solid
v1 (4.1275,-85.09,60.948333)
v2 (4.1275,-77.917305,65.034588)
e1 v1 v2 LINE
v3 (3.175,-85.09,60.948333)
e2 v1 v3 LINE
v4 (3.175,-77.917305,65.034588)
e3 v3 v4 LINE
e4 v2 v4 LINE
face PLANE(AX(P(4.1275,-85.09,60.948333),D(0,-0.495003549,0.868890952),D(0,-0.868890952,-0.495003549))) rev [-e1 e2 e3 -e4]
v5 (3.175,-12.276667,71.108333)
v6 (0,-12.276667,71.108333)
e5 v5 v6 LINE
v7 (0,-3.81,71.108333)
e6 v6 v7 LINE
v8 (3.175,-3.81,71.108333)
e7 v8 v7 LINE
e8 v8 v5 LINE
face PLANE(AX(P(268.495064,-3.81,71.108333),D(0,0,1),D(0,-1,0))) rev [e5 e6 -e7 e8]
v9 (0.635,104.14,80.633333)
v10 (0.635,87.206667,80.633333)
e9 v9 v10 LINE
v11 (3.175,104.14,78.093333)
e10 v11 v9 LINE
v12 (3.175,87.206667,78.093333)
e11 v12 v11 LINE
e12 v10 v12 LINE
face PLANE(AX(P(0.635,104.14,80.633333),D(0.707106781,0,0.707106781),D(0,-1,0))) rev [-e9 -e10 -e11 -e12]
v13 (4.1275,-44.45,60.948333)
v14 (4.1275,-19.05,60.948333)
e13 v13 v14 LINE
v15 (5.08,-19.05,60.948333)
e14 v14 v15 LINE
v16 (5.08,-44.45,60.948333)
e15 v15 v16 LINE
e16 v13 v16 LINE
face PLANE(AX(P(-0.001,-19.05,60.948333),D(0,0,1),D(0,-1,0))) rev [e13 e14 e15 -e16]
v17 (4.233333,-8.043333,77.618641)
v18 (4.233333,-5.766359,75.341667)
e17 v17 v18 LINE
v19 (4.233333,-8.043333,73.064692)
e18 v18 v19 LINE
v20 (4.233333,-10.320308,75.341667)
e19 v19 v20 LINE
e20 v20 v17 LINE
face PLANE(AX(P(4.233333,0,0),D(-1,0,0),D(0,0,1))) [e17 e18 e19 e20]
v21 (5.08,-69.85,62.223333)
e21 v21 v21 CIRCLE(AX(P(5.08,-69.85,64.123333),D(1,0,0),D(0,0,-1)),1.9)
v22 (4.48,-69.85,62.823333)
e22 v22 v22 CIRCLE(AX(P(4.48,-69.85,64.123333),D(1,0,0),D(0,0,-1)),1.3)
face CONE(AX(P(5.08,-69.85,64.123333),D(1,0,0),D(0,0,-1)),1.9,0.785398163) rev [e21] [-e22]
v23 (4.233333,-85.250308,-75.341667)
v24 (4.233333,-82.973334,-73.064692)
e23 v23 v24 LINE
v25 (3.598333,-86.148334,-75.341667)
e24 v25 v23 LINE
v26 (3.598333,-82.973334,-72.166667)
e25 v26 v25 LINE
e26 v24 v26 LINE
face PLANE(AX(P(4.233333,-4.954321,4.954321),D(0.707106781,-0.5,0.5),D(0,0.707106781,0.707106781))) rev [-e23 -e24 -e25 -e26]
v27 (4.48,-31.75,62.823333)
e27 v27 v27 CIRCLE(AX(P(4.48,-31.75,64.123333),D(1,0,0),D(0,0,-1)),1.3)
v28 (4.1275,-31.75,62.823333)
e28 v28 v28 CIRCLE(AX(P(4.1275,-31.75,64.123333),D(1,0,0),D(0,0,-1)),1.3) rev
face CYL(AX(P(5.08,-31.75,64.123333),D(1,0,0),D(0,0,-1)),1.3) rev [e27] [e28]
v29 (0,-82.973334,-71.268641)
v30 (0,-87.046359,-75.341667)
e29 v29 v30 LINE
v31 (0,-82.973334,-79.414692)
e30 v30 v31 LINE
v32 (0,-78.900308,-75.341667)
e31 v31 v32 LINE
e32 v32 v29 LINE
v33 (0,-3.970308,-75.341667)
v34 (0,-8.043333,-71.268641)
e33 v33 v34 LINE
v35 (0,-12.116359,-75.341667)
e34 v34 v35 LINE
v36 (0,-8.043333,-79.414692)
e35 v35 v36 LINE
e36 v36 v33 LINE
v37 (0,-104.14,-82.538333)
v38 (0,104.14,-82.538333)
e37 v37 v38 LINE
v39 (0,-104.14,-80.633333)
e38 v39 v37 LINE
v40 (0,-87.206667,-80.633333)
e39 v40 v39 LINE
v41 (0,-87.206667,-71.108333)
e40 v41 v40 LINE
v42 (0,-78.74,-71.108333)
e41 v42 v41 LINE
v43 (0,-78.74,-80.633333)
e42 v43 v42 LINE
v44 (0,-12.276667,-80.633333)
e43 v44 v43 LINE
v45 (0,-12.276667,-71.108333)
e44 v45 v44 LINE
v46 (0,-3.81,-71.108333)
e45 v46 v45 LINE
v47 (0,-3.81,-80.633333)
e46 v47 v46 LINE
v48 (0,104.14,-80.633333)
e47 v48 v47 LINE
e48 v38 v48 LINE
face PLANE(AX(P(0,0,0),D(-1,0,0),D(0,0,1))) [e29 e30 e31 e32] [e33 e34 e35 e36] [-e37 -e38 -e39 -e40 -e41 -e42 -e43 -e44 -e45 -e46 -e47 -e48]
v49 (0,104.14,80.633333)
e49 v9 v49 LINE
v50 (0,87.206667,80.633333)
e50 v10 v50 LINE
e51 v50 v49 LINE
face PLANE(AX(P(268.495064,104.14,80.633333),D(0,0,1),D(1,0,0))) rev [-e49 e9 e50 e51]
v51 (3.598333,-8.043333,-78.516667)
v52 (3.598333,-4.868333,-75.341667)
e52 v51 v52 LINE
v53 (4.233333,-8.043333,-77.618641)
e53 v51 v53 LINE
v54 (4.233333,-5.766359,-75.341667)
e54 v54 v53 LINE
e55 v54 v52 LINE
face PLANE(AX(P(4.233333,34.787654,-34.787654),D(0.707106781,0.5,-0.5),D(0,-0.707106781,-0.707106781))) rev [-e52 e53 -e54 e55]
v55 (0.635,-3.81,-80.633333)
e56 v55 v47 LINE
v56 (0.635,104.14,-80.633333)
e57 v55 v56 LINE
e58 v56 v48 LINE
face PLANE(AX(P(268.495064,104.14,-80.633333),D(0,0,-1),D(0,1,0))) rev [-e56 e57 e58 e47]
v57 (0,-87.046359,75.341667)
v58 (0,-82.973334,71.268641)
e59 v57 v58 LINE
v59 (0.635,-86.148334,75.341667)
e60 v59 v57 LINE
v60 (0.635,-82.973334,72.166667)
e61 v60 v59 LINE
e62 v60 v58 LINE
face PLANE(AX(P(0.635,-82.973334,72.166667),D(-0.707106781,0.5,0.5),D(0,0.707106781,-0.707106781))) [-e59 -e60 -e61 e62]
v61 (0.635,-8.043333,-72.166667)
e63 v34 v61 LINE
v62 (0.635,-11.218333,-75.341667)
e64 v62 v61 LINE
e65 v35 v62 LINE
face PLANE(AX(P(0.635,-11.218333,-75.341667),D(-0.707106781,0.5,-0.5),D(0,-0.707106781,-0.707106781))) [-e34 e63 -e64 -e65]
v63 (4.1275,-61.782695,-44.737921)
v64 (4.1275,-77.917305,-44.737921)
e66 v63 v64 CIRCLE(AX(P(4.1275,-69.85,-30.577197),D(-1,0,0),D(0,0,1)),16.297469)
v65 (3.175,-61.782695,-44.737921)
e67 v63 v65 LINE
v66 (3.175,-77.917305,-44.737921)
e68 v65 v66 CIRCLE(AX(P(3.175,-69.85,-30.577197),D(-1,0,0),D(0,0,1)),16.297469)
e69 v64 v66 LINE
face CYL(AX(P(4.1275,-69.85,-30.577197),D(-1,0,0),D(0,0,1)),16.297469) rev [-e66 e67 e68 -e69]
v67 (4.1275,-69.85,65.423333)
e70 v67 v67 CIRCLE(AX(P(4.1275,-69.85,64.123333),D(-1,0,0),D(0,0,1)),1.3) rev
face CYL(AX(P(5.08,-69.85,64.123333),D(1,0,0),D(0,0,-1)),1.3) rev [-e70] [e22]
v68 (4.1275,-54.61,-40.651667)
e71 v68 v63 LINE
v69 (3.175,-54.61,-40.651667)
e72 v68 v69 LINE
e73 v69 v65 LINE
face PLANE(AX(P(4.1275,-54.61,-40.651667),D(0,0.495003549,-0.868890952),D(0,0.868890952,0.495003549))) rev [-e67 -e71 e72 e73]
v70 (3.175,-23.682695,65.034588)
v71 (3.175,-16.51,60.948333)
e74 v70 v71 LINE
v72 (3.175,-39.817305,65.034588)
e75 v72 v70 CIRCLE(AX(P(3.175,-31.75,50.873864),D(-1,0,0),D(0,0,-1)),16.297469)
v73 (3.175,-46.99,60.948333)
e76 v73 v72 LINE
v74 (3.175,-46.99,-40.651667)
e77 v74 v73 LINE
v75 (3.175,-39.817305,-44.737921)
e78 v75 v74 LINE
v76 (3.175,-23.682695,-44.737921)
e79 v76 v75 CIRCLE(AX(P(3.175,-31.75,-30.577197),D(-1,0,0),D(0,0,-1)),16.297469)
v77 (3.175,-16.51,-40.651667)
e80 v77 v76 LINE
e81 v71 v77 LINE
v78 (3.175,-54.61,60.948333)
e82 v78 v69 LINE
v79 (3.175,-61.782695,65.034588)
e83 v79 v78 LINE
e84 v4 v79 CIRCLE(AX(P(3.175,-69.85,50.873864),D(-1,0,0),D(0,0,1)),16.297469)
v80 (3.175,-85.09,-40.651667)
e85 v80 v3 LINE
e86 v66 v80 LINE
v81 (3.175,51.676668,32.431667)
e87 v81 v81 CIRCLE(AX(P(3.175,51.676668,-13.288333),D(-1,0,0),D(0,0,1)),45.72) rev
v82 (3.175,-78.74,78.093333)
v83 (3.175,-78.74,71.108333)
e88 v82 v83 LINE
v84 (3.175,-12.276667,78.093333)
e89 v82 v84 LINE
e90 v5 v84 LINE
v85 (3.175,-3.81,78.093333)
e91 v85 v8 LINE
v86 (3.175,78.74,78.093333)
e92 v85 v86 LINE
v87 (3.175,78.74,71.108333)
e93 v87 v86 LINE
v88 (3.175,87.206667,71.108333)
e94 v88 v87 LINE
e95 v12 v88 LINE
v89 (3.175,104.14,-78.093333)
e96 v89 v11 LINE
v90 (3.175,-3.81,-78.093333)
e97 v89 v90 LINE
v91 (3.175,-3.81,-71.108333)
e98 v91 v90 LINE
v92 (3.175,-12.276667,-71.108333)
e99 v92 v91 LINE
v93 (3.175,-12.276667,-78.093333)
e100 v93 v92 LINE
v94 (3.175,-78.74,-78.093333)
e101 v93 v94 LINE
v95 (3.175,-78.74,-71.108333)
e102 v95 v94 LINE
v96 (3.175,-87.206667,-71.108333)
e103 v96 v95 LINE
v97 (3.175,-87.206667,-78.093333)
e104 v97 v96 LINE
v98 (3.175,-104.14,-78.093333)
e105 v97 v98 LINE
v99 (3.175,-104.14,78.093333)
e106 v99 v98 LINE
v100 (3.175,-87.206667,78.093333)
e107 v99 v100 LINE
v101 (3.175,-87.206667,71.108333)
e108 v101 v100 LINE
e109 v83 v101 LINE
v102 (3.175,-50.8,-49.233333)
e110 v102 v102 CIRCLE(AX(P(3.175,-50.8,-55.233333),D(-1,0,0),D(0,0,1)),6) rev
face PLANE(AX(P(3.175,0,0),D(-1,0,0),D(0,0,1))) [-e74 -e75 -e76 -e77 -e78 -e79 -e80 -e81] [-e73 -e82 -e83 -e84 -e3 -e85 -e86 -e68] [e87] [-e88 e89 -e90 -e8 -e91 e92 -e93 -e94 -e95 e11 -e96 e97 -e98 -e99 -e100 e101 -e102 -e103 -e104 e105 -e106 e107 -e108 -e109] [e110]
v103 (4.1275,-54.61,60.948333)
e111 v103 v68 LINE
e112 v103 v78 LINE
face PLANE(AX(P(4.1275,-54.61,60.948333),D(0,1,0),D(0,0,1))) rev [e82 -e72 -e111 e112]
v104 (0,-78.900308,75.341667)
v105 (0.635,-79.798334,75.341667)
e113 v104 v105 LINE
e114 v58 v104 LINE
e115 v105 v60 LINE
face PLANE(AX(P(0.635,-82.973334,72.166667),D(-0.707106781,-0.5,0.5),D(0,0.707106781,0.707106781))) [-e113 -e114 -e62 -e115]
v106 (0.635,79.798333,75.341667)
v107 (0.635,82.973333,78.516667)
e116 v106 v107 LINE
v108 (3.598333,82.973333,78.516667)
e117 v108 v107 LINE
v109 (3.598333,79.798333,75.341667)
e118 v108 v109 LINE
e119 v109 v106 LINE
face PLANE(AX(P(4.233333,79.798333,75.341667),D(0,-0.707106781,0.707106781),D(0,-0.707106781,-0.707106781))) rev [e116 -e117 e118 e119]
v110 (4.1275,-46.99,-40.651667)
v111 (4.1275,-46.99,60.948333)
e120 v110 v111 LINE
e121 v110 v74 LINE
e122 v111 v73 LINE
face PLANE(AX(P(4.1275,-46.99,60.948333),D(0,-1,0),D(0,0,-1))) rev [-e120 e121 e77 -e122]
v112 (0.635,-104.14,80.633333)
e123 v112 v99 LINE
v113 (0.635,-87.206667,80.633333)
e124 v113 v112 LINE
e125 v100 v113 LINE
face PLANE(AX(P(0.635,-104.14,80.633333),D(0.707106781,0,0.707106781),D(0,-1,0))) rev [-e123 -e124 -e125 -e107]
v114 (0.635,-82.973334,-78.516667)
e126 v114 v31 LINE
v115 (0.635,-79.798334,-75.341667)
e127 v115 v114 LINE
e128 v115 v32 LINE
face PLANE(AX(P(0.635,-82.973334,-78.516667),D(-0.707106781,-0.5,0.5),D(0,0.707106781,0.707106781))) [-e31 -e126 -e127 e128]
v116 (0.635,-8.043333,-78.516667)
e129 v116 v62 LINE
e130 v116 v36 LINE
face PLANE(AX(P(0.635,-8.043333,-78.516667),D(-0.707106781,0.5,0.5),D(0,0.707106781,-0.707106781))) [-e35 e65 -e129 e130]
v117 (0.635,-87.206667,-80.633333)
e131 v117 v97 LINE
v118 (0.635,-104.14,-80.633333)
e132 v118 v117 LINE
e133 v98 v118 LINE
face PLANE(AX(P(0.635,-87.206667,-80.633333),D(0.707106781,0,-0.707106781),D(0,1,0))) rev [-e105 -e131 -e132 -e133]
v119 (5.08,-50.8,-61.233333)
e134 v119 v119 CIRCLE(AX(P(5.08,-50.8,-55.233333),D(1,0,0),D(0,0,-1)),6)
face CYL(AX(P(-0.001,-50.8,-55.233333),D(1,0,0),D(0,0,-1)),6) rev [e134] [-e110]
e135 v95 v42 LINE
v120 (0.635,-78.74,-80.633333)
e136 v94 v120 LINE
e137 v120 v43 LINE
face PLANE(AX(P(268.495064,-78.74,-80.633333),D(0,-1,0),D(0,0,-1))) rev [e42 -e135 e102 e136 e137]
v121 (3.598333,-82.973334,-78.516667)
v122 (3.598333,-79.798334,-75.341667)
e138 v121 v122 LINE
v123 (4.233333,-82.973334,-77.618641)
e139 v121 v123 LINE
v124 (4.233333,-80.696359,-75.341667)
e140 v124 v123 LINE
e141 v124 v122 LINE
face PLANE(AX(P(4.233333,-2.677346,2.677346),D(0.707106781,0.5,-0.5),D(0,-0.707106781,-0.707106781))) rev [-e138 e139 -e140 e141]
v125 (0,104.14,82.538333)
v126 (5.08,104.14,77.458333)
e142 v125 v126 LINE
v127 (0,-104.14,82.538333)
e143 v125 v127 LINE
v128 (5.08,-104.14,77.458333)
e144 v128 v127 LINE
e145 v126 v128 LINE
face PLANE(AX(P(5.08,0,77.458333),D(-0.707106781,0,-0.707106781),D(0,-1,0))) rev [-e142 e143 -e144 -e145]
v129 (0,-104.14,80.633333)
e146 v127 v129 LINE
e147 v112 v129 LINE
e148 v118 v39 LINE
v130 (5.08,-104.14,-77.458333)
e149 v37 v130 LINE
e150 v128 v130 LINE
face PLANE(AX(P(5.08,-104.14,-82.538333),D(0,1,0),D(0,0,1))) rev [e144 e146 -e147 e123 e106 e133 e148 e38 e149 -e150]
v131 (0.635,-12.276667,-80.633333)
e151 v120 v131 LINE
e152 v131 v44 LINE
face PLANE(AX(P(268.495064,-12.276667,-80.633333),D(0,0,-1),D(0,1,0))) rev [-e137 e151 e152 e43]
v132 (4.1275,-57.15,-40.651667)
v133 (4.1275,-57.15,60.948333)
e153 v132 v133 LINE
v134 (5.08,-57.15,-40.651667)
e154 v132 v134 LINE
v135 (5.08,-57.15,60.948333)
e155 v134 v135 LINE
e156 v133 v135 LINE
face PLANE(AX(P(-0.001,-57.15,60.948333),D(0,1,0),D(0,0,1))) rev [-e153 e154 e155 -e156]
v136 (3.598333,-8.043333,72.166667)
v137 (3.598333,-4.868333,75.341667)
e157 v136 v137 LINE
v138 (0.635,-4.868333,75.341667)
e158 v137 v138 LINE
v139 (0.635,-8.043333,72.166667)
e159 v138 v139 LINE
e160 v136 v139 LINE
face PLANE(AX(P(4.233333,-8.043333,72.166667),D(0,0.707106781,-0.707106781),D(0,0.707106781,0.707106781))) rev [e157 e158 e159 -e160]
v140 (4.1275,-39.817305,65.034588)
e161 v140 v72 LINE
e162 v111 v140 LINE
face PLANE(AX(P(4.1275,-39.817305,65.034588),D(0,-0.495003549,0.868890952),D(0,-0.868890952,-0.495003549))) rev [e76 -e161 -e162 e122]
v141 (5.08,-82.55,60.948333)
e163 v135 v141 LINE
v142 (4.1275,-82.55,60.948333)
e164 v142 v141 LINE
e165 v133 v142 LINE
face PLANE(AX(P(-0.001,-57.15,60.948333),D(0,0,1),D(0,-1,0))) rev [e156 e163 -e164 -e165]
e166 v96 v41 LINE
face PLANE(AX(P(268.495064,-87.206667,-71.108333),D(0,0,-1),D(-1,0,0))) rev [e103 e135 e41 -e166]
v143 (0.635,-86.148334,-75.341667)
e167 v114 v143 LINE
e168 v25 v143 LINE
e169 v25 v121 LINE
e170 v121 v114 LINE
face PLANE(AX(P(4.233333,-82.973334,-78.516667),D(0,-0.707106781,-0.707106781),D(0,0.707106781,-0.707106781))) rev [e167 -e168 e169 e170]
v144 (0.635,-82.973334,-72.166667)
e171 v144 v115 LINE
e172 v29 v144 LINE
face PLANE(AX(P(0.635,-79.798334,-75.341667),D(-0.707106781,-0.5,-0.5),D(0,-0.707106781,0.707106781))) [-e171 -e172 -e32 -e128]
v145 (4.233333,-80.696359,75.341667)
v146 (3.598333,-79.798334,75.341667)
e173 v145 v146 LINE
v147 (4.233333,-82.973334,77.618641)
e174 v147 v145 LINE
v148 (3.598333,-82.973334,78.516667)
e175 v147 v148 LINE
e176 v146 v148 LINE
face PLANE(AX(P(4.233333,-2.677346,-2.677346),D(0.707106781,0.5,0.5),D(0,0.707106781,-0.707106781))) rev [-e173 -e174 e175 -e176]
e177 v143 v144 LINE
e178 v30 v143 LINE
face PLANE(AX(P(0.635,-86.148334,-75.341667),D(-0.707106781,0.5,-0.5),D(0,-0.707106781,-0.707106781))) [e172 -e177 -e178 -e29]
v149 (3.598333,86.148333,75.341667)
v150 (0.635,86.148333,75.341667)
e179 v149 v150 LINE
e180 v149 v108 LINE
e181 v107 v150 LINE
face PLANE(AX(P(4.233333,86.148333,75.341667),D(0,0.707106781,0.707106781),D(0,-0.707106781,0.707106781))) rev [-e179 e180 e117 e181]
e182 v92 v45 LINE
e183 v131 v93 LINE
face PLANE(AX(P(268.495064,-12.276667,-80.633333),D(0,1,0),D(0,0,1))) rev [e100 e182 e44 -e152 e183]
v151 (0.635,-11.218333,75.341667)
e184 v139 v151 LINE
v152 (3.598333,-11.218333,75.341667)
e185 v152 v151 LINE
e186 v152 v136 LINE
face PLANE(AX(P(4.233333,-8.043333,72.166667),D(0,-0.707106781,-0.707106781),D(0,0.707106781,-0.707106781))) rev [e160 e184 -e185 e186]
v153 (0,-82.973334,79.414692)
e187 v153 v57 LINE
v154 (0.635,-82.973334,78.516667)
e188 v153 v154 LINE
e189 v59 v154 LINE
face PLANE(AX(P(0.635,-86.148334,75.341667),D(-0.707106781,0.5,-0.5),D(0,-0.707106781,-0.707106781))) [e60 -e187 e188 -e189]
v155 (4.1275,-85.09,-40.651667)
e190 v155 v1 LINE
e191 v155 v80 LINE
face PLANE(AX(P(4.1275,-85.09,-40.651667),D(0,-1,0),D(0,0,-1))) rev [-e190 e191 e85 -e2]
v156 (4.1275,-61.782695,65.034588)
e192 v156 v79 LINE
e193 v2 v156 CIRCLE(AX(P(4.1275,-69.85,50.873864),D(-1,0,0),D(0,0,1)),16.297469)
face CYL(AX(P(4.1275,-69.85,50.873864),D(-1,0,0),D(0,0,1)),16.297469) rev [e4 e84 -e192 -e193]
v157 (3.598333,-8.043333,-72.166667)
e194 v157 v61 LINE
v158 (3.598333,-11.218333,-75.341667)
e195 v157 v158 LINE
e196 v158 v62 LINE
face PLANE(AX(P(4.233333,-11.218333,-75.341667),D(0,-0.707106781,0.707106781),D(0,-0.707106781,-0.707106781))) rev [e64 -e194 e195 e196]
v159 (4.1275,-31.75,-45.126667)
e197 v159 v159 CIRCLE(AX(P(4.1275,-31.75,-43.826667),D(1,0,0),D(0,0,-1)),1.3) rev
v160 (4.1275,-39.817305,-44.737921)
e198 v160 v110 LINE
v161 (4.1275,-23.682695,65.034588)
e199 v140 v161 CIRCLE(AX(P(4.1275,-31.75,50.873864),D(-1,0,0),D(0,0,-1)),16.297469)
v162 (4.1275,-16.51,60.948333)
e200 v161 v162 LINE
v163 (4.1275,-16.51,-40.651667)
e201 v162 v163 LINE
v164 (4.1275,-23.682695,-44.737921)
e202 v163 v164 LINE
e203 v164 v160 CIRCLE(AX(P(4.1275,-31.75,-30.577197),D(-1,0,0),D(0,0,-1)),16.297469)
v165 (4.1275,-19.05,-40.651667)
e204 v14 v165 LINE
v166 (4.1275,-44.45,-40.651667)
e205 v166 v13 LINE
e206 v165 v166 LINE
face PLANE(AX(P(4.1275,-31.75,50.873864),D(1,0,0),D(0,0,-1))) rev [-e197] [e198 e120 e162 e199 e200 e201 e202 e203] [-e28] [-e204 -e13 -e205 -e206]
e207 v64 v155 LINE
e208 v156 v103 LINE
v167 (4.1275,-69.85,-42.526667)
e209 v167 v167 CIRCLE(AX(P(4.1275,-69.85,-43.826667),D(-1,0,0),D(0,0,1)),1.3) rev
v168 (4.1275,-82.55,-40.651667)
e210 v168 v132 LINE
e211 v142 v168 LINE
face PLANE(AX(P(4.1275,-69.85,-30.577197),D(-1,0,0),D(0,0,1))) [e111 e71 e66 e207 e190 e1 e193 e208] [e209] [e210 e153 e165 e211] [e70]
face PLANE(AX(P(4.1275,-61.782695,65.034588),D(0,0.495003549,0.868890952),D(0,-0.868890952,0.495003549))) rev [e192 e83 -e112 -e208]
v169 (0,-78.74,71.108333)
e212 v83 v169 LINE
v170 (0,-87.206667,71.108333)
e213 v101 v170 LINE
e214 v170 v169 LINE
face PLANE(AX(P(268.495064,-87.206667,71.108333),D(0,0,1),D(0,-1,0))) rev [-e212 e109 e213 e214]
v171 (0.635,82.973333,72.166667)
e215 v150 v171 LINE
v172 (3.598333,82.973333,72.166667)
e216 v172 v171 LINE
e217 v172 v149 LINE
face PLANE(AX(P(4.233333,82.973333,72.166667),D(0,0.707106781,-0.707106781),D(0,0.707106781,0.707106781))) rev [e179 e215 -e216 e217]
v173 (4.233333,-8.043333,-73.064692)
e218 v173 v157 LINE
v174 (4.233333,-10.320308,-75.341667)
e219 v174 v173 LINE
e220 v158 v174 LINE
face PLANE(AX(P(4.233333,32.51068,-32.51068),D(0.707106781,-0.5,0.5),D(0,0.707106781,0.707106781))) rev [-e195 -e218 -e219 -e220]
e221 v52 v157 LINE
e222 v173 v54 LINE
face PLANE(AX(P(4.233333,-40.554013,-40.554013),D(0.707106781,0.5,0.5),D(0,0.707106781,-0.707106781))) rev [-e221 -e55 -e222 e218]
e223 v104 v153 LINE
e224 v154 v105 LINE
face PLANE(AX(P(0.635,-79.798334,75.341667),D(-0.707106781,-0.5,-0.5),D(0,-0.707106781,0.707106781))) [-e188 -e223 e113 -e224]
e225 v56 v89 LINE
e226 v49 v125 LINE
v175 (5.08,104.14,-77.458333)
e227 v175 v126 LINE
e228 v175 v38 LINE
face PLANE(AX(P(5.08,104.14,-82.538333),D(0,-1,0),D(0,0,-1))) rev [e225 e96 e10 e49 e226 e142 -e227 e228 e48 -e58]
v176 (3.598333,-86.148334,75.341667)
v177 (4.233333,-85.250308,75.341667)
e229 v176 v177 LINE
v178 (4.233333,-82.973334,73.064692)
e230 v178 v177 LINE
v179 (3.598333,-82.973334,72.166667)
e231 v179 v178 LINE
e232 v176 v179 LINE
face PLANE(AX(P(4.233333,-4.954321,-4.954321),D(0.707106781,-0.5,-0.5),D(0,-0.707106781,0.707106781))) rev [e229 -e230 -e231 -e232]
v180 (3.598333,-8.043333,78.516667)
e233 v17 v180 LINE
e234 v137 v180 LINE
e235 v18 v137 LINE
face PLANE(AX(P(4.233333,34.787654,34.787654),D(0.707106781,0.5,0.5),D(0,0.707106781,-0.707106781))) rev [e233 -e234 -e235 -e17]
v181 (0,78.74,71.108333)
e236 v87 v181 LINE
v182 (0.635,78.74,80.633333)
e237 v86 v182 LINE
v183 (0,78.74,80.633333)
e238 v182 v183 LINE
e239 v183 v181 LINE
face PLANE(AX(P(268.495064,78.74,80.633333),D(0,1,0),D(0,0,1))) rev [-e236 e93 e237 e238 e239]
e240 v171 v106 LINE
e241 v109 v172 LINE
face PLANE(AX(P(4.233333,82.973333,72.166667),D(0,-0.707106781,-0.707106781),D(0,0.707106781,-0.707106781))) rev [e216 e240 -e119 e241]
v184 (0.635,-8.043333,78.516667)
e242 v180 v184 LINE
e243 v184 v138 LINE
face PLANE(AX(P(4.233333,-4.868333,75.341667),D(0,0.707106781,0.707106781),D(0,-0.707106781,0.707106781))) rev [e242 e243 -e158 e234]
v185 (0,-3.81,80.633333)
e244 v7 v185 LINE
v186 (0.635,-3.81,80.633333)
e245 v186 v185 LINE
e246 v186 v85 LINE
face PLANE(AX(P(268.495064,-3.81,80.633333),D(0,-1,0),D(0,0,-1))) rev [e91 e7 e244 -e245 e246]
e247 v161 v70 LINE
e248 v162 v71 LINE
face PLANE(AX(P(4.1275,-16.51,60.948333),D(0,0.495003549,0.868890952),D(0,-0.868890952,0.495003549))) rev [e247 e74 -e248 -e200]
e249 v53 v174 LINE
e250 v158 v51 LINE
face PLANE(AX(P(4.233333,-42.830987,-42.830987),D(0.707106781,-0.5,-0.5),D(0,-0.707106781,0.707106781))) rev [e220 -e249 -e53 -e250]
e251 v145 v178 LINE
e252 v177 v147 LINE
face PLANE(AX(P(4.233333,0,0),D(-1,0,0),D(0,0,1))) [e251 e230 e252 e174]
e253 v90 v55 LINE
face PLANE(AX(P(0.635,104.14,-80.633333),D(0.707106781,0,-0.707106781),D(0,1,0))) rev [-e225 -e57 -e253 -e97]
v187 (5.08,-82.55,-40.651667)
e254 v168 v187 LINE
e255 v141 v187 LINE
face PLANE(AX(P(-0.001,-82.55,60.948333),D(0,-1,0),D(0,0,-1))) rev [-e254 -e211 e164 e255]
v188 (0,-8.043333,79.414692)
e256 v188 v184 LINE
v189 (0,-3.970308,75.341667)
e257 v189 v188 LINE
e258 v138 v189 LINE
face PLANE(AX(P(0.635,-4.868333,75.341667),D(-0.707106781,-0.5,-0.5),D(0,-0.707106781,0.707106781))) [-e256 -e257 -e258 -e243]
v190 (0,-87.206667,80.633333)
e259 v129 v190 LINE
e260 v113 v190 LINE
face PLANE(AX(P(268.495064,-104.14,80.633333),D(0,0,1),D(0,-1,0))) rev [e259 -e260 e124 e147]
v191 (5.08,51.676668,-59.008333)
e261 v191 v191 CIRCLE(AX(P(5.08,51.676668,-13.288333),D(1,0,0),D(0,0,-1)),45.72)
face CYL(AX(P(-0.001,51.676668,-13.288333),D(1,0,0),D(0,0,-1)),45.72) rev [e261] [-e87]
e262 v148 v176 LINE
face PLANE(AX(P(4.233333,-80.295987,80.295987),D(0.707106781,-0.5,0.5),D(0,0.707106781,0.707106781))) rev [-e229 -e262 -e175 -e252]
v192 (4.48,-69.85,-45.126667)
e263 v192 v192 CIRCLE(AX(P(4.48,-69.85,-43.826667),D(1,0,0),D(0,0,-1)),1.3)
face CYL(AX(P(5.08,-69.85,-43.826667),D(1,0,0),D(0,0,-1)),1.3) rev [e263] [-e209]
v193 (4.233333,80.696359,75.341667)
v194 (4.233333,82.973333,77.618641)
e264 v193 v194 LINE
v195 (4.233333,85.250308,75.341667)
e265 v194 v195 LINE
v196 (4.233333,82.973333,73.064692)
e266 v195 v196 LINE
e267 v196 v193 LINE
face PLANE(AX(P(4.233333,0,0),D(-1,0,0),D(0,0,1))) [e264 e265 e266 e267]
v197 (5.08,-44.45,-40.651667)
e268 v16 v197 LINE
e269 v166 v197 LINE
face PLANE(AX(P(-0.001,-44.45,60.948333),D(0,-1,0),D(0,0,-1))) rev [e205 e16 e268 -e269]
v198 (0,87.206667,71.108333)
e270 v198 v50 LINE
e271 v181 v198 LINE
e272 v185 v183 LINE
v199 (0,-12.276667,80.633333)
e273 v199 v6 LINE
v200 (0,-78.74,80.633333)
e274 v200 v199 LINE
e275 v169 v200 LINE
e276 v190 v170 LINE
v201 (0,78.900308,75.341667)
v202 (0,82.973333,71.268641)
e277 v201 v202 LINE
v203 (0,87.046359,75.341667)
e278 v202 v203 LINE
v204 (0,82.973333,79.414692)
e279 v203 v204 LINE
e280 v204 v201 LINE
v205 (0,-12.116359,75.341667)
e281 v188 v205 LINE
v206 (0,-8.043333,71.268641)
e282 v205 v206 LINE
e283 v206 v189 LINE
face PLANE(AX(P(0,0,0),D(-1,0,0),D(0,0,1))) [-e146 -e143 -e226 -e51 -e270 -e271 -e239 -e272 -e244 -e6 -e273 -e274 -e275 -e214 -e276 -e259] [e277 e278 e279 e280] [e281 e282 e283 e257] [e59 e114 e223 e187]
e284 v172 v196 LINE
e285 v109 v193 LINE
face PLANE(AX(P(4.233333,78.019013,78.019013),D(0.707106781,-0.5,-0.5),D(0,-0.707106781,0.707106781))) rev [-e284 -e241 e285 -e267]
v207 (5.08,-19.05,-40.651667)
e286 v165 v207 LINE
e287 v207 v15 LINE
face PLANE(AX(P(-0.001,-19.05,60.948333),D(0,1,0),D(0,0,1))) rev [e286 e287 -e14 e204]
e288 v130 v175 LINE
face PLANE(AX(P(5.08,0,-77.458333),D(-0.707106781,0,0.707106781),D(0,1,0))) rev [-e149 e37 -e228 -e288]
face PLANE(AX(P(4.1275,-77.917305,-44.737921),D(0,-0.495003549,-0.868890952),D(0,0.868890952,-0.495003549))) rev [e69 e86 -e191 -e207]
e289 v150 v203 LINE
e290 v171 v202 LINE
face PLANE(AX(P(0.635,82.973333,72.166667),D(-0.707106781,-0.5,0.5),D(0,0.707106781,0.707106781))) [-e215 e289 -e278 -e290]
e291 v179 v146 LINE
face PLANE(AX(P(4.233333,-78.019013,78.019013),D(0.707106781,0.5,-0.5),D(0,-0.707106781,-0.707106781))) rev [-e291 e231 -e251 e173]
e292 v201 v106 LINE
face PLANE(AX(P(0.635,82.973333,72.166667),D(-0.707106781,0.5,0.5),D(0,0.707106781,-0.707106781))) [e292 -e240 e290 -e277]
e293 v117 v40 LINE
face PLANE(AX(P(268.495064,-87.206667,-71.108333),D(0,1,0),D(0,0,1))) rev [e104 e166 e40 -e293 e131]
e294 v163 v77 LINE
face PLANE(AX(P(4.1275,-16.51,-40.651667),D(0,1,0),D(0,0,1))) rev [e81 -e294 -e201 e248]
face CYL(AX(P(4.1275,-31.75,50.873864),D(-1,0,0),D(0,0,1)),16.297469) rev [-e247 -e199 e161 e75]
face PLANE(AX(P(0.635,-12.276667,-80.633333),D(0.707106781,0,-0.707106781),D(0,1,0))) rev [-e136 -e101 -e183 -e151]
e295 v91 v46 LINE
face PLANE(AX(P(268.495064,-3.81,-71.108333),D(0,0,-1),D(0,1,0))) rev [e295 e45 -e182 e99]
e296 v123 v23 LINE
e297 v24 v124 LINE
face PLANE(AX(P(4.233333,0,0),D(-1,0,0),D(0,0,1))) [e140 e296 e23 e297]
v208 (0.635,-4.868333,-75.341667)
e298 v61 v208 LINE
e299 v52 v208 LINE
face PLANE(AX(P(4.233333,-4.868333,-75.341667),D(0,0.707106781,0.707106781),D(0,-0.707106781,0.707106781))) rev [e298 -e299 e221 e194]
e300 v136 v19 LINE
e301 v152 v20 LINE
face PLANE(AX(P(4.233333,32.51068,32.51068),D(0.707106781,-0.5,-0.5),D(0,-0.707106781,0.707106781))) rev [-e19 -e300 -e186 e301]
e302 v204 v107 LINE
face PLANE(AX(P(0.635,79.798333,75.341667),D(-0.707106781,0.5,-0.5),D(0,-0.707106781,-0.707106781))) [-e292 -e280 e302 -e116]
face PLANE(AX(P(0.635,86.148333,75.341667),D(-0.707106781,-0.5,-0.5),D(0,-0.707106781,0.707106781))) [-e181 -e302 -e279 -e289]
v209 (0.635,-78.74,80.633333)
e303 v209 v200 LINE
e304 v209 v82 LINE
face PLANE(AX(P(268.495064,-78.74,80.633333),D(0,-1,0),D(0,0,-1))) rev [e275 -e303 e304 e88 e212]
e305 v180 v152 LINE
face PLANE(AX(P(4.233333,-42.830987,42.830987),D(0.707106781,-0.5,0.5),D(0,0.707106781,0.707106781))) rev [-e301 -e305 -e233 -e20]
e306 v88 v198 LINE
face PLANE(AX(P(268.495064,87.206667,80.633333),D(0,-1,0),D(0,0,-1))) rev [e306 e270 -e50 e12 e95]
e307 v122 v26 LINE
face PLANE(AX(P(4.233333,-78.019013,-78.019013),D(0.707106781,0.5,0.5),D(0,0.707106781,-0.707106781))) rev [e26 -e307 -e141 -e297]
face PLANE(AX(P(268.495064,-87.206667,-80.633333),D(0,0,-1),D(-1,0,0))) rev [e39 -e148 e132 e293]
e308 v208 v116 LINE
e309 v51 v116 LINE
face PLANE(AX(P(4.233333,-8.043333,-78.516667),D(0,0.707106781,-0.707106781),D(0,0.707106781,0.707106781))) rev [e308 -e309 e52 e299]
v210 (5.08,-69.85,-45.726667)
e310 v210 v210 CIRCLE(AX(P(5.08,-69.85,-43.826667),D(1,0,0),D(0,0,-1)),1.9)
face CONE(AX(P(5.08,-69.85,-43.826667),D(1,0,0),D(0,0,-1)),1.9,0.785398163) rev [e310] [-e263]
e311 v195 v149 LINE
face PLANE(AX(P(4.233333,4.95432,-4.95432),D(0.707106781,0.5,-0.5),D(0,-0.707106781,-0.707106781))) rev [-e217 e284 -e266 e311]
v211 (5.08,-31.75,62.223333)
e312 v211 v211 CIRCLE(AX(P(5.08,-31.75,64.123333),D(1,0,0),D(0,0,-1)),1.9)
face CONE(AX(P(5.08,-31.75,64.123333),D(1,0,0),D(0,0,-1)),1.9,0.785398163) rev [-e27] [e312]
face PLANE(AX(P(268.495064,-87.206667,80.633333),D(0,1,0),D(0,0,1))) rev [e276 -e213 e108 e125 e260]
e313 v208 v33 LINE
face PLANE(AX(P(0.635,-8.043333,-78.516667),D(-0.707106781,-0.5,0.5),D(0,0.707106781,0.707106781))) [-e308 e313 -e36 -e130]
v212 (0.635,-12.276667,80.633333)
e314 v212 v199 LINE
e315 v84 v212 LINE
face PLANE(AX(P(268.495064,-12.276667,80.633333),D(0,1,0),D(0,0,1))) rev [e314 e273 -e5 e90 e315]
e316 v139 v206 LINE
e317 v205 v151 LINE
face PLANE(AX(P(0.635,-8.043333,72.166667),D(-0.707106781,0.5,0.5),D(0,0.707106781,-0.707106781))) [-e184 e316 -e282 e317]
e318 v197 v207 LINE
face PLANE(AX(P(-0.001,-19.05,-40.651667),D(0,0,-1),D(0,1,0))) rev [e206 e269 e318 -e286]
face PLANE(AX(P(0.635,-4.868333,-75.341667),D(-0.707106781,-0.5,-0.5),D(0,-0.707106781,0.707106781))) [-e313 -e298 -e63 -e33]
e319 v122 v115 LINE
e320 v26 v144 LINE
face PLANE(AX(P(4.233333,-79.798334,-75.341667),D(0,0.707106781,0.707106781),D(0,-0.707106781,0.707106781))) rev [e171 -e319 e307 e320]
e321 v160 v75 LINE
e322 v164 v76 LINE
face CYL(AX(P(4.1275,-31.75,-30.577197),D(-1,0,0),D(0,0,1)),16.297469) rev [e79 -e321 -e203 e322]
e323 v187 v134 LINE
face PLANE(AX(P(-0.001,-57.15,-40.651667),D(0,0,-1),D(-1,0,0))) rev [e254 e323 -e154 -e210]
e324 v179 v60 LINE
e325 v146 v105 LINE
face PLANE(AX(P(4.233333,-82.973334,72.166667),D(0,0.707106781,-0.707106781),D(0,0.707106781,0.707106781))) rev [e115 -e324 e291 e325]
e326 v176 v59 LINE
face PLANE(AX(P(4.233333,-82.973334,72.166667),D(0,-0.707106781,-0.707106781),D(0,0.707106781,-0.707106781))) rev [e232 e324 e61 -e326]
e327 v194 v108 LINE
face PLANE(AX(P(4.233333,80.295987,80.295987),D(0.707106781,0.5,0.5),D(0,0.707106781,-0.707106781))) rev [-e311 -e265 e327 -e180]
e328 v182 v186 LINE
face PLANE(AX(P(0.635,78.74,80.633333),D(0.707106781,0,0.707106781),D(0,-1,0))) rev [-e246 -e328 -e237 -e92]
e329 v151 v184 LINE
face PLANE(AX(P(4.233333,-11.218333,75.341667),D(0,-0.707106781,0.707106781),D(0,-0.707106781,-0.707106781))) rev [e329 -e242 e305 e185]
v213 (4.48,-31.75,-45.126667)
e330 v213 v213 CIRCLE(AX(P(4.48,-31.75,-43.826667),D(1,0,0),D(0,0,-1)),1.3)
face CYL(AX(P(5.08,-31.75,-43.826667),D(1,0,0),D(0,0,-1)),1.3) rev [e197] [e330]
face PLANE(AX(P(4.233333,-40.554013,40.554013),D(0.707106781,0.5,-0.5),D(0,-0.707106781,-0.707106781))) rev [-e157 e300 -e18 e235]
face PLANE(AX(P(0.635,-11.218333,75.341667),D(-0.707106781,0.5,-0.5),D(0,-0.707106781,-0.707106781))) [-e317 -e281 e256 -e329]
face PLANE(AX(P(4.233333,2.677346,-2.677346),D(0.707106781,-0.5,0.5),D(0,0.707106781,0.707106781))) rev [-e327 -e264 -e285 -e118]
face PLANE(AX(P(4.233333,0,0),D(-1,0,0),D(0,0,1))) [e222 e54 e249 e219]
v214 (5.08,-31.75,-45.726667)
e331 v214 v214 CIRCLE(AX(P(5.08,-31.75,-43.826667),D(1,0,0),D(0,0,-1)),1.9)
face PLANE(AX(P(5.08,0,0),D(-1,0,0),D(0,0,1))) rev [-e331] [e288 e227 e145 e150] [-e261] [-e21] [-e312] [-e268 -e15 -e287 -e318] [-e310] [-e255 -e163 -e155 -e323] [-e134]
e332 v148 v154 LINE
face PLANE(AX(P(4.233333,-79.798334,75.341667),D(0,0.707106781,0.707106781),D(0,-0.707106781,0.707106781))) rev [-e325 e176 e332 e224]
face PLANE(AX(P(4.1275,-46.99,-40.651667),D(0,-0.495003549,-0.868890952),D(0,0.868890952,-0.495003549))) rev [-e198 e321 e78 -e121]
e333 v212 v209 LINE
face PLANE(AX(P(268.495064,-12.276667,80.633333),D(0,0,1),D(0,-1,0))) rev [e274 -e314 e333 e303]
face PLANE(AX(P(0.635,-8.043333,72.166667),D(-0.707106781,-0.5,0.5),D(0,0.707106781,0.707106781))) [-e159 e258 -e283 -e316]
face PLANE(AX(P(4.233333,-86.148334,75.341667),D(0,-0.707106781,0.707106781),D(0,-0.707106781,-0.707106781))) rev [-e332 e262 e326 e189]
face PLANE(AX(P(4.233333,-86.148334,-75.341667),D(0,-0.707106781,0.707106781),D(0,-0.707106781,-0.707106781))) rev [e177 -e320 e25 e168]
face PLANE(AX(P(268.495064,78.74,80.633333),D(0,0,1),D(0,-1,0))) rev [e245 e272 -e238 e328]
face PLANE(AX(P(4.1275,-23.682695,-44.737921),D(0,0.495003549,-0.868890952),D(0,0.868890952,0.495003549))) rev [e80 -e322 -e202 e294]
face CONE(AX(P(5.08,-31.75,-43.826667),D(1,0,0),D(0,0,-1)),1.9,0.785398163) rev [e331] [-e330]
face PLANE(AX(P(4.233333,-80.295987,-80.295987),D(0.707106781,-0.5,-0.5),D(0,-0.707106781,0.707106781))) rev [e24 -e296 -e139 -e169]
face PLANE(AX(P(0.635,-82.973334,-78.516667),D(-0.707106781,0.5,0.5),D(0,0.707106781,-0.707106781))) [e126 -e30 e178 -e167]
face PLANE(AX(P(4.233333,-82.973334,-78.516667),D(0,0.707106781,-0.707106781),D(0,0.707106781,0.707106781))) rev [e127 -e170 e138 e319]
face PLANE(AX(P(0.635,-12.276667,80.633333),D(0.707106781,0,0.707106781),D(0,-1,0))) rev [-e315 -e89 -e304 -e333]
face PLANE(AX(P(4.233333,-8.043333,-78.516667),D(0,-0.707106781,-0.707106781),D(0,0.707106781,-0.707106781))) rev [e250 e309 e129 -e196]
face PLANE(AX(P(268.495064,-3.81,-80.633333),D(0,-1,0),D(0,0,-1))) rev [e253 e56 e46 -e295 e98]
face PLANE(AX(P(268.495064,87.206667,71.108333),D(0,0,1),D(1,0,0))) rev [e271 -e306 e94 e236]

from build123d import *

# Parameters (mm, degrees)
SKETCH1_W                      = 165.076666628
SKETCH1_H                      = 208.28
BOSS_EXTRUDE1_DEPTH            = 5.08
CUT_EXTRUDE1_DEPTH             = 3.175
CUT_EXTRUDE2_REACH             = 134.979
SKETCH8_R                      = 45.72
CUT_EXTRUDE3_REACH             = 134.979
SKETCH9_R                      = 6
SKETCH9_W                      = 101.6
SKETCH9_H                      = 25.4
M2_CLEARANCE_HOLE1_D           = 2.6
M2_CLEARANCE_HOLE1_CSINK_D     = 3.8
M2_CLEARANCE_HOLE1_CSINK_ANGLE = 90
CUT_EXTRUDE4_DEPTH             = 0.9525
CUT_EXTRUDE7_DEPTH             = 4.233333418
CHAMFER1_SIZE                  = 0.635
CHAMFER2_SIZE                  = 2.54
CHAMFER3_SIZE                  = 5.08


with BuildPart() as part:
    # Sketch1 → Boss-Extrude1 (new body)
    with BuildSketch(Plane(origin=(0, 0, 0), x_dir=(0, 0, -1), z_dir=(1, 0, 0))):
        Rectangle(SKETCH1_W, SKETCH1_H)
    extrude(amount=BOSS_EXTRUDE1_DEPTH)

    # Sketch3 → Cut-Extrude1 (cut)
    with BuildSketch(Plane.ZY):
        Polygon((-80.633333314, -12.276666667), (-80.633333314, -78.740000169), (-71.108333314, -78.740000169), (-71.108333314, -87.206666836), (-80.633333314, -87.206666836), (-80.633333314, -104.14), (80.633333314, -104.14), (80.633333314, -87.206666836), (71.108333314, -87.206666836), (71.108333314, -78.740000169), (80.633333314, -78.740000169), (80.633333314, -12.276666667), (71.108333314, -12.276666667), (71.108333314, -3.81), (80.633333314, -3.81), (80.633333314, 78.74), (71.108333314, 78.74), (71.108333314, 87.206666667), (80.633333314, 87.206666667), (80.633333314, 104.14), (-80.633333314, 104.14), (-80.633333314, -3.81), (-71.108333314, -3.81), (-71.108333314, -12.276666667), align=None)
    extrude(amount=-CUT_EXTRUDE1_DEPTH, mode=Mode.SUBTRACT)

    # Sketch8 → Cut-Extrude2 (cut, up to next)
    with BuildSketch(Plane(origin=(5.08, 0, 0), x_dir=(0, 0, -1), z_dir=(1, 0, 0)), mode=Mode.PRIVATE) as cut_extrude2_sk1:
        with Locations((13.288333225, 51.676668489)):
            Circle(SKETCH8_R)
    cut_extrude2_tool1 = extrude(cut_extrude2_sk1.sketch, amount=-CUT_EXTRUDE2_REACH, mode=Mode.PRIVATE) & part.part
    add(cut_extrude2_tool1.solids().sort_by_distance((5.08, 51.676668, -13.288333))[0], mode=Mode.SUBTRACT)

    # Sketch9 → Cut-Extrude3 (cut, up to next)
    with BuildSketch(Plane(origin=(5.08, 0, 0), x_dir=(0, 0, -1), z_dir=(1, 0, 0)), mode=Mode.PRIVATE) as cut_extrude3_sk1:
        with Locations((55.233333314, -50.8)):
            Circle(SKETCH9_R)
    cut_extrude3_tool1 = extrude(cut_extrude3_sk1.sketch, amount=-CUT_EXTRUDE3_REACH, mode=Mode.PRIVATE) & part.part
    # Sketch9 → Cut-Extrude3 (cut, up to next)
    with BuildSketch(Plane(origin=(5.08, 0, 0), x_dir=(0, 0, -1), z_dir=(1, 0, 0)), mode=Mode.PRIVATE) as cut_extrude3_sk2:
        with Locations((-10.148333314, -31.75)):
            Rectangle(SKETCH9_W, SKETCH9_H)
    cut_extrude3_tool2 = extrude(cut_extrude3_sk2.sketch, amount=-CUT_EXTRUDE3_REACH, mode=Mode.PRIVATE) & part.part
    # Sketch9 → Cut-Extrude3 (cut, up to next)
    with BuildSketch(Plane(origin=(5.08, 0, 0), x_dir=(0, 0, -1), z_dir=(1, 0, 0)), mode=Mode.PRIVATE) as cut_extrude3_sk3:
        with Locations((-10.148333314, -69.85)):
            Rectangle(SKETCH9_W, SKETCH9_H)
    cut_extrude3_tool3 = extrude(cut_extrude3_sk3.sketch, amount=-CUT_EXTRUDE3_REACH, mode=Mode.PRIVATE) & part.part
    add(cut_extrude3_tool1.solids().sort_by_distance((5.08, -50.8, -55.233333))[0], mode=Mode.SUBTRACT)
    add(cut_extrude3_tool2.solids().sort_by_distance((5.08, -31.75, 10.148333))[0], mode=Mode.SUBTRACT)
    add(cut_extrude3_tool3.solids().sort_by_distance((5.08, -69.85, 10.148333))[0], mode=Mode.SUBTRACT)

    # M2 Clearance Hole1 (through all)
    with Locations(Plane(origin=(5.08, 0, 0), x_dir=(0, 0, -1), z_dir=(1, 0, 0))):
        with Locations((-64.123333314, -69.85), (43.826666686, -69.85), (43.826666686, -31.75), (-64.123333314, -31.75)):
            CounterSinkHole(M2_CLEARANCE_HOLE1_D / 2, M2_CLEARANCE_HOLE1_CSINK_D / 2, counter_sink_angle=M2_CLEARANCE_HOLE1_CSINK_ANGLE)

    # Sketch12 → Cut-Extrude4 (cut)
    with BuildSketch(Plane.ZY.offset(-3.175)):
        with BuildLine():
            Line((-40.651666686, -16.51), (60.948333314, -16.51))
            Line((60.948333314, -16.51), (65.034587615, -23.682694807))
            ThreePointArc((65.034587615, -23.682694807), (67.171333314, -31.75), (65.034587615, -39.817305193))
            Line((65.034587615, -39.817305193), (60.948333314, -46.99))
            Line((60.948333314, -46.99), (-40.651666686, -46.99))
            Line((-40.651666686, -46.99), (-44.737920986, -39.817305193))
            ThreePointArc((-44.737920986, -39.817305193), (-46.874666686, -31.75), (-44.737920986, -23.682694807))
            Line((-44.737920986, -23.682694807), (-40.651666686, -16.51))
        make_face()
        with BuildLine():
            Line((-44.737920986, -77.917305193), (-40.651666686, -85.09))
            Line((-40.651666686, -85.09), (60.948333314, -85.09))
            Line((60.948333314, -85.09), (65.034587615, -77.917305193))
            ThreePointArc((65.034587615, -77.917305193), (67.171333314, -69.85), (65.034587615, -61.782694807))
            Line((65.034587615, -61.782694807), (60.948333314, -54.61))
            Line((60.948333314, -54.61), (-40.651666686, -54.61))
            Line((-40.651666686, -54.61), (-44.737920986, -61.782694807))
            ThreePointArc((-44.737920986, -61.782694807), (-46.874666686, -69.85), (-44.737920986, -77.917305193))
        make_face()
    extrude(amount=-CUT_EXTRUDE4_DEPTH, mode=Mode.SUBTRACT)

    # Sketch13 → Cut-Extrude7 (cut)
    with BuildSketch(Plane.ZY):
        Polygon((-78.516666732, -8.043333333), (-75.341666732, -4.868333333), (-72.166666732, -8.043333333), (-75.341666732, -11.218333333), align=None)
        Polygon((-78.516666732, -82.973333503), (-75.341666732, -79.798333503), (-72.166666732, -82.973333503), (-75.341666732, -86.148333503), align=None)
        Polygon((72.166666732, -82.973333503), (75.341666732, -79.798333503), (78.516666732, -82.973333503), (75.341666732, -86.148333503), align=None)
        Polygon((72.166666732, -8.043333333), (75.341666732, -4.868333333), (78.516666732, -8.043333333), (75.341666732, -11.218333333), align=None)
        Polygon((72.166666732, 82.973333333), (75.341666732, 86.148333333), (78.516666732, 82.973333333), (75.341666732, 79.798333333), align=None)
    extrude(amount=-CUT_EXTRUDE7_DEPTH, mode=Mode.SUBTRACT)

    # Chamfer1
    chamfer1_edges = [part.edges().sort_by_distance(p)[0] for p in [
        (4.233333418, 81.385833333, 73.754166732),
        (4.233333418, 84.560833333, 73.754166732),
        (4.233333418, 84.560833333, 76.929166732),
        (4.233333418, 81.385833333, 76.929166732),
        (0, 81.385833333, 73.754166732),
        (0, 81.385833333, 76.929166732),
        (0, 84.560833333, 76.929166732),
        (0, 84.560833333, 73.754166732),
        (4.233333418, -9.630833333, 73.754166732),
        (4.233333418, -6.455833333, 73.754166732),
        (4.233333418, -6.455833333, 76.929166732),
        (4.233333418, -9.630833333, 76.929166732),
        (0, -9.630833333, 73.754166732),
        (0, -9.630833333, 76.929166732),
        (0, -6.455833333, 76.929166732),
        (0, -6.455833333, 73.754166732),
        (4.233333418, -84.560833503, 73.754166732),
        (4.233333418, -81.385833503, 73.754166732),
        (4.233333418, -81.385833503, 76.929166732),
        (4.233333418, -84.560833503, 76.929166732),
        (0, -84.560833503, 73.754166732),
        (0, -84.560833503, 76.929166732),
        (0, -81.385833503, 76.929166732),
        (0, -81.385833503, 73.754166732),
        (4.233333418, -84.560833503, -76.929166732),
        (4.233333418, -81.385833503, -76.929166732),
        (4.233333418, -81.385833503, -73.754166732),
        (4.233333418, -84.560833503, -73.754166732),
        (0, -84.560833503, -76.929166732),
        (0, -84.560833503, -73.754166732),
        (0, -81.385833503, -73.754166732),
        (0, -81.385833503, -76.929166732),
        (4.233333418, -9.630833333, -76.929166732),
        (4.233333418, -6.455833333, -76.929166732),
        (4.233333418, -6.455833333, -73.754166732),
        (4.233333418, -9.630833333, -73.754166732),
        (0, -9.630833333, -76.929166732),
        (0, -9.630833333, -73.754166732),
        (0, -6.455833333, -73.754166732),
        (0, -6.455833333, -76.929166732),
    ]]
    chamfer(chamfer1_edges, length=CHAMFER1_SIZE)

    # Chamfer2
    chamfer2_edges = [part.edges().sort_by_distance(p)[0] for p in [
        (3.175, 95.673333333, 80.633333314),
        (3.175, 37.465, 80.633333314),
        (3.175, -45.508333418, 80.633333314),
        (3.175, -95.673333418, 80.633333314),
        (3.175, -95.673333418, -80.633333314),
        (3.175, -45.508333418, -80.633333314),
        (3.175, 50.165, -80.633333314),
    ]]
    chamfer(chamfer2_edges, length=CHAMFER2_SIZE)

    # Chamfer3
    chamfer3_edges = [part.edges().sort_by_distance(p)[0] for p in [
        (5.08, 0, -82.538333314),
        (5.08, 0, 82.538333314),
    ]]
    chamfer(chamfer3_edges, length=CHAMFER3_SIZE - 0.0001)  # a hair under: the kernel refuses the full size


solid = part.part
